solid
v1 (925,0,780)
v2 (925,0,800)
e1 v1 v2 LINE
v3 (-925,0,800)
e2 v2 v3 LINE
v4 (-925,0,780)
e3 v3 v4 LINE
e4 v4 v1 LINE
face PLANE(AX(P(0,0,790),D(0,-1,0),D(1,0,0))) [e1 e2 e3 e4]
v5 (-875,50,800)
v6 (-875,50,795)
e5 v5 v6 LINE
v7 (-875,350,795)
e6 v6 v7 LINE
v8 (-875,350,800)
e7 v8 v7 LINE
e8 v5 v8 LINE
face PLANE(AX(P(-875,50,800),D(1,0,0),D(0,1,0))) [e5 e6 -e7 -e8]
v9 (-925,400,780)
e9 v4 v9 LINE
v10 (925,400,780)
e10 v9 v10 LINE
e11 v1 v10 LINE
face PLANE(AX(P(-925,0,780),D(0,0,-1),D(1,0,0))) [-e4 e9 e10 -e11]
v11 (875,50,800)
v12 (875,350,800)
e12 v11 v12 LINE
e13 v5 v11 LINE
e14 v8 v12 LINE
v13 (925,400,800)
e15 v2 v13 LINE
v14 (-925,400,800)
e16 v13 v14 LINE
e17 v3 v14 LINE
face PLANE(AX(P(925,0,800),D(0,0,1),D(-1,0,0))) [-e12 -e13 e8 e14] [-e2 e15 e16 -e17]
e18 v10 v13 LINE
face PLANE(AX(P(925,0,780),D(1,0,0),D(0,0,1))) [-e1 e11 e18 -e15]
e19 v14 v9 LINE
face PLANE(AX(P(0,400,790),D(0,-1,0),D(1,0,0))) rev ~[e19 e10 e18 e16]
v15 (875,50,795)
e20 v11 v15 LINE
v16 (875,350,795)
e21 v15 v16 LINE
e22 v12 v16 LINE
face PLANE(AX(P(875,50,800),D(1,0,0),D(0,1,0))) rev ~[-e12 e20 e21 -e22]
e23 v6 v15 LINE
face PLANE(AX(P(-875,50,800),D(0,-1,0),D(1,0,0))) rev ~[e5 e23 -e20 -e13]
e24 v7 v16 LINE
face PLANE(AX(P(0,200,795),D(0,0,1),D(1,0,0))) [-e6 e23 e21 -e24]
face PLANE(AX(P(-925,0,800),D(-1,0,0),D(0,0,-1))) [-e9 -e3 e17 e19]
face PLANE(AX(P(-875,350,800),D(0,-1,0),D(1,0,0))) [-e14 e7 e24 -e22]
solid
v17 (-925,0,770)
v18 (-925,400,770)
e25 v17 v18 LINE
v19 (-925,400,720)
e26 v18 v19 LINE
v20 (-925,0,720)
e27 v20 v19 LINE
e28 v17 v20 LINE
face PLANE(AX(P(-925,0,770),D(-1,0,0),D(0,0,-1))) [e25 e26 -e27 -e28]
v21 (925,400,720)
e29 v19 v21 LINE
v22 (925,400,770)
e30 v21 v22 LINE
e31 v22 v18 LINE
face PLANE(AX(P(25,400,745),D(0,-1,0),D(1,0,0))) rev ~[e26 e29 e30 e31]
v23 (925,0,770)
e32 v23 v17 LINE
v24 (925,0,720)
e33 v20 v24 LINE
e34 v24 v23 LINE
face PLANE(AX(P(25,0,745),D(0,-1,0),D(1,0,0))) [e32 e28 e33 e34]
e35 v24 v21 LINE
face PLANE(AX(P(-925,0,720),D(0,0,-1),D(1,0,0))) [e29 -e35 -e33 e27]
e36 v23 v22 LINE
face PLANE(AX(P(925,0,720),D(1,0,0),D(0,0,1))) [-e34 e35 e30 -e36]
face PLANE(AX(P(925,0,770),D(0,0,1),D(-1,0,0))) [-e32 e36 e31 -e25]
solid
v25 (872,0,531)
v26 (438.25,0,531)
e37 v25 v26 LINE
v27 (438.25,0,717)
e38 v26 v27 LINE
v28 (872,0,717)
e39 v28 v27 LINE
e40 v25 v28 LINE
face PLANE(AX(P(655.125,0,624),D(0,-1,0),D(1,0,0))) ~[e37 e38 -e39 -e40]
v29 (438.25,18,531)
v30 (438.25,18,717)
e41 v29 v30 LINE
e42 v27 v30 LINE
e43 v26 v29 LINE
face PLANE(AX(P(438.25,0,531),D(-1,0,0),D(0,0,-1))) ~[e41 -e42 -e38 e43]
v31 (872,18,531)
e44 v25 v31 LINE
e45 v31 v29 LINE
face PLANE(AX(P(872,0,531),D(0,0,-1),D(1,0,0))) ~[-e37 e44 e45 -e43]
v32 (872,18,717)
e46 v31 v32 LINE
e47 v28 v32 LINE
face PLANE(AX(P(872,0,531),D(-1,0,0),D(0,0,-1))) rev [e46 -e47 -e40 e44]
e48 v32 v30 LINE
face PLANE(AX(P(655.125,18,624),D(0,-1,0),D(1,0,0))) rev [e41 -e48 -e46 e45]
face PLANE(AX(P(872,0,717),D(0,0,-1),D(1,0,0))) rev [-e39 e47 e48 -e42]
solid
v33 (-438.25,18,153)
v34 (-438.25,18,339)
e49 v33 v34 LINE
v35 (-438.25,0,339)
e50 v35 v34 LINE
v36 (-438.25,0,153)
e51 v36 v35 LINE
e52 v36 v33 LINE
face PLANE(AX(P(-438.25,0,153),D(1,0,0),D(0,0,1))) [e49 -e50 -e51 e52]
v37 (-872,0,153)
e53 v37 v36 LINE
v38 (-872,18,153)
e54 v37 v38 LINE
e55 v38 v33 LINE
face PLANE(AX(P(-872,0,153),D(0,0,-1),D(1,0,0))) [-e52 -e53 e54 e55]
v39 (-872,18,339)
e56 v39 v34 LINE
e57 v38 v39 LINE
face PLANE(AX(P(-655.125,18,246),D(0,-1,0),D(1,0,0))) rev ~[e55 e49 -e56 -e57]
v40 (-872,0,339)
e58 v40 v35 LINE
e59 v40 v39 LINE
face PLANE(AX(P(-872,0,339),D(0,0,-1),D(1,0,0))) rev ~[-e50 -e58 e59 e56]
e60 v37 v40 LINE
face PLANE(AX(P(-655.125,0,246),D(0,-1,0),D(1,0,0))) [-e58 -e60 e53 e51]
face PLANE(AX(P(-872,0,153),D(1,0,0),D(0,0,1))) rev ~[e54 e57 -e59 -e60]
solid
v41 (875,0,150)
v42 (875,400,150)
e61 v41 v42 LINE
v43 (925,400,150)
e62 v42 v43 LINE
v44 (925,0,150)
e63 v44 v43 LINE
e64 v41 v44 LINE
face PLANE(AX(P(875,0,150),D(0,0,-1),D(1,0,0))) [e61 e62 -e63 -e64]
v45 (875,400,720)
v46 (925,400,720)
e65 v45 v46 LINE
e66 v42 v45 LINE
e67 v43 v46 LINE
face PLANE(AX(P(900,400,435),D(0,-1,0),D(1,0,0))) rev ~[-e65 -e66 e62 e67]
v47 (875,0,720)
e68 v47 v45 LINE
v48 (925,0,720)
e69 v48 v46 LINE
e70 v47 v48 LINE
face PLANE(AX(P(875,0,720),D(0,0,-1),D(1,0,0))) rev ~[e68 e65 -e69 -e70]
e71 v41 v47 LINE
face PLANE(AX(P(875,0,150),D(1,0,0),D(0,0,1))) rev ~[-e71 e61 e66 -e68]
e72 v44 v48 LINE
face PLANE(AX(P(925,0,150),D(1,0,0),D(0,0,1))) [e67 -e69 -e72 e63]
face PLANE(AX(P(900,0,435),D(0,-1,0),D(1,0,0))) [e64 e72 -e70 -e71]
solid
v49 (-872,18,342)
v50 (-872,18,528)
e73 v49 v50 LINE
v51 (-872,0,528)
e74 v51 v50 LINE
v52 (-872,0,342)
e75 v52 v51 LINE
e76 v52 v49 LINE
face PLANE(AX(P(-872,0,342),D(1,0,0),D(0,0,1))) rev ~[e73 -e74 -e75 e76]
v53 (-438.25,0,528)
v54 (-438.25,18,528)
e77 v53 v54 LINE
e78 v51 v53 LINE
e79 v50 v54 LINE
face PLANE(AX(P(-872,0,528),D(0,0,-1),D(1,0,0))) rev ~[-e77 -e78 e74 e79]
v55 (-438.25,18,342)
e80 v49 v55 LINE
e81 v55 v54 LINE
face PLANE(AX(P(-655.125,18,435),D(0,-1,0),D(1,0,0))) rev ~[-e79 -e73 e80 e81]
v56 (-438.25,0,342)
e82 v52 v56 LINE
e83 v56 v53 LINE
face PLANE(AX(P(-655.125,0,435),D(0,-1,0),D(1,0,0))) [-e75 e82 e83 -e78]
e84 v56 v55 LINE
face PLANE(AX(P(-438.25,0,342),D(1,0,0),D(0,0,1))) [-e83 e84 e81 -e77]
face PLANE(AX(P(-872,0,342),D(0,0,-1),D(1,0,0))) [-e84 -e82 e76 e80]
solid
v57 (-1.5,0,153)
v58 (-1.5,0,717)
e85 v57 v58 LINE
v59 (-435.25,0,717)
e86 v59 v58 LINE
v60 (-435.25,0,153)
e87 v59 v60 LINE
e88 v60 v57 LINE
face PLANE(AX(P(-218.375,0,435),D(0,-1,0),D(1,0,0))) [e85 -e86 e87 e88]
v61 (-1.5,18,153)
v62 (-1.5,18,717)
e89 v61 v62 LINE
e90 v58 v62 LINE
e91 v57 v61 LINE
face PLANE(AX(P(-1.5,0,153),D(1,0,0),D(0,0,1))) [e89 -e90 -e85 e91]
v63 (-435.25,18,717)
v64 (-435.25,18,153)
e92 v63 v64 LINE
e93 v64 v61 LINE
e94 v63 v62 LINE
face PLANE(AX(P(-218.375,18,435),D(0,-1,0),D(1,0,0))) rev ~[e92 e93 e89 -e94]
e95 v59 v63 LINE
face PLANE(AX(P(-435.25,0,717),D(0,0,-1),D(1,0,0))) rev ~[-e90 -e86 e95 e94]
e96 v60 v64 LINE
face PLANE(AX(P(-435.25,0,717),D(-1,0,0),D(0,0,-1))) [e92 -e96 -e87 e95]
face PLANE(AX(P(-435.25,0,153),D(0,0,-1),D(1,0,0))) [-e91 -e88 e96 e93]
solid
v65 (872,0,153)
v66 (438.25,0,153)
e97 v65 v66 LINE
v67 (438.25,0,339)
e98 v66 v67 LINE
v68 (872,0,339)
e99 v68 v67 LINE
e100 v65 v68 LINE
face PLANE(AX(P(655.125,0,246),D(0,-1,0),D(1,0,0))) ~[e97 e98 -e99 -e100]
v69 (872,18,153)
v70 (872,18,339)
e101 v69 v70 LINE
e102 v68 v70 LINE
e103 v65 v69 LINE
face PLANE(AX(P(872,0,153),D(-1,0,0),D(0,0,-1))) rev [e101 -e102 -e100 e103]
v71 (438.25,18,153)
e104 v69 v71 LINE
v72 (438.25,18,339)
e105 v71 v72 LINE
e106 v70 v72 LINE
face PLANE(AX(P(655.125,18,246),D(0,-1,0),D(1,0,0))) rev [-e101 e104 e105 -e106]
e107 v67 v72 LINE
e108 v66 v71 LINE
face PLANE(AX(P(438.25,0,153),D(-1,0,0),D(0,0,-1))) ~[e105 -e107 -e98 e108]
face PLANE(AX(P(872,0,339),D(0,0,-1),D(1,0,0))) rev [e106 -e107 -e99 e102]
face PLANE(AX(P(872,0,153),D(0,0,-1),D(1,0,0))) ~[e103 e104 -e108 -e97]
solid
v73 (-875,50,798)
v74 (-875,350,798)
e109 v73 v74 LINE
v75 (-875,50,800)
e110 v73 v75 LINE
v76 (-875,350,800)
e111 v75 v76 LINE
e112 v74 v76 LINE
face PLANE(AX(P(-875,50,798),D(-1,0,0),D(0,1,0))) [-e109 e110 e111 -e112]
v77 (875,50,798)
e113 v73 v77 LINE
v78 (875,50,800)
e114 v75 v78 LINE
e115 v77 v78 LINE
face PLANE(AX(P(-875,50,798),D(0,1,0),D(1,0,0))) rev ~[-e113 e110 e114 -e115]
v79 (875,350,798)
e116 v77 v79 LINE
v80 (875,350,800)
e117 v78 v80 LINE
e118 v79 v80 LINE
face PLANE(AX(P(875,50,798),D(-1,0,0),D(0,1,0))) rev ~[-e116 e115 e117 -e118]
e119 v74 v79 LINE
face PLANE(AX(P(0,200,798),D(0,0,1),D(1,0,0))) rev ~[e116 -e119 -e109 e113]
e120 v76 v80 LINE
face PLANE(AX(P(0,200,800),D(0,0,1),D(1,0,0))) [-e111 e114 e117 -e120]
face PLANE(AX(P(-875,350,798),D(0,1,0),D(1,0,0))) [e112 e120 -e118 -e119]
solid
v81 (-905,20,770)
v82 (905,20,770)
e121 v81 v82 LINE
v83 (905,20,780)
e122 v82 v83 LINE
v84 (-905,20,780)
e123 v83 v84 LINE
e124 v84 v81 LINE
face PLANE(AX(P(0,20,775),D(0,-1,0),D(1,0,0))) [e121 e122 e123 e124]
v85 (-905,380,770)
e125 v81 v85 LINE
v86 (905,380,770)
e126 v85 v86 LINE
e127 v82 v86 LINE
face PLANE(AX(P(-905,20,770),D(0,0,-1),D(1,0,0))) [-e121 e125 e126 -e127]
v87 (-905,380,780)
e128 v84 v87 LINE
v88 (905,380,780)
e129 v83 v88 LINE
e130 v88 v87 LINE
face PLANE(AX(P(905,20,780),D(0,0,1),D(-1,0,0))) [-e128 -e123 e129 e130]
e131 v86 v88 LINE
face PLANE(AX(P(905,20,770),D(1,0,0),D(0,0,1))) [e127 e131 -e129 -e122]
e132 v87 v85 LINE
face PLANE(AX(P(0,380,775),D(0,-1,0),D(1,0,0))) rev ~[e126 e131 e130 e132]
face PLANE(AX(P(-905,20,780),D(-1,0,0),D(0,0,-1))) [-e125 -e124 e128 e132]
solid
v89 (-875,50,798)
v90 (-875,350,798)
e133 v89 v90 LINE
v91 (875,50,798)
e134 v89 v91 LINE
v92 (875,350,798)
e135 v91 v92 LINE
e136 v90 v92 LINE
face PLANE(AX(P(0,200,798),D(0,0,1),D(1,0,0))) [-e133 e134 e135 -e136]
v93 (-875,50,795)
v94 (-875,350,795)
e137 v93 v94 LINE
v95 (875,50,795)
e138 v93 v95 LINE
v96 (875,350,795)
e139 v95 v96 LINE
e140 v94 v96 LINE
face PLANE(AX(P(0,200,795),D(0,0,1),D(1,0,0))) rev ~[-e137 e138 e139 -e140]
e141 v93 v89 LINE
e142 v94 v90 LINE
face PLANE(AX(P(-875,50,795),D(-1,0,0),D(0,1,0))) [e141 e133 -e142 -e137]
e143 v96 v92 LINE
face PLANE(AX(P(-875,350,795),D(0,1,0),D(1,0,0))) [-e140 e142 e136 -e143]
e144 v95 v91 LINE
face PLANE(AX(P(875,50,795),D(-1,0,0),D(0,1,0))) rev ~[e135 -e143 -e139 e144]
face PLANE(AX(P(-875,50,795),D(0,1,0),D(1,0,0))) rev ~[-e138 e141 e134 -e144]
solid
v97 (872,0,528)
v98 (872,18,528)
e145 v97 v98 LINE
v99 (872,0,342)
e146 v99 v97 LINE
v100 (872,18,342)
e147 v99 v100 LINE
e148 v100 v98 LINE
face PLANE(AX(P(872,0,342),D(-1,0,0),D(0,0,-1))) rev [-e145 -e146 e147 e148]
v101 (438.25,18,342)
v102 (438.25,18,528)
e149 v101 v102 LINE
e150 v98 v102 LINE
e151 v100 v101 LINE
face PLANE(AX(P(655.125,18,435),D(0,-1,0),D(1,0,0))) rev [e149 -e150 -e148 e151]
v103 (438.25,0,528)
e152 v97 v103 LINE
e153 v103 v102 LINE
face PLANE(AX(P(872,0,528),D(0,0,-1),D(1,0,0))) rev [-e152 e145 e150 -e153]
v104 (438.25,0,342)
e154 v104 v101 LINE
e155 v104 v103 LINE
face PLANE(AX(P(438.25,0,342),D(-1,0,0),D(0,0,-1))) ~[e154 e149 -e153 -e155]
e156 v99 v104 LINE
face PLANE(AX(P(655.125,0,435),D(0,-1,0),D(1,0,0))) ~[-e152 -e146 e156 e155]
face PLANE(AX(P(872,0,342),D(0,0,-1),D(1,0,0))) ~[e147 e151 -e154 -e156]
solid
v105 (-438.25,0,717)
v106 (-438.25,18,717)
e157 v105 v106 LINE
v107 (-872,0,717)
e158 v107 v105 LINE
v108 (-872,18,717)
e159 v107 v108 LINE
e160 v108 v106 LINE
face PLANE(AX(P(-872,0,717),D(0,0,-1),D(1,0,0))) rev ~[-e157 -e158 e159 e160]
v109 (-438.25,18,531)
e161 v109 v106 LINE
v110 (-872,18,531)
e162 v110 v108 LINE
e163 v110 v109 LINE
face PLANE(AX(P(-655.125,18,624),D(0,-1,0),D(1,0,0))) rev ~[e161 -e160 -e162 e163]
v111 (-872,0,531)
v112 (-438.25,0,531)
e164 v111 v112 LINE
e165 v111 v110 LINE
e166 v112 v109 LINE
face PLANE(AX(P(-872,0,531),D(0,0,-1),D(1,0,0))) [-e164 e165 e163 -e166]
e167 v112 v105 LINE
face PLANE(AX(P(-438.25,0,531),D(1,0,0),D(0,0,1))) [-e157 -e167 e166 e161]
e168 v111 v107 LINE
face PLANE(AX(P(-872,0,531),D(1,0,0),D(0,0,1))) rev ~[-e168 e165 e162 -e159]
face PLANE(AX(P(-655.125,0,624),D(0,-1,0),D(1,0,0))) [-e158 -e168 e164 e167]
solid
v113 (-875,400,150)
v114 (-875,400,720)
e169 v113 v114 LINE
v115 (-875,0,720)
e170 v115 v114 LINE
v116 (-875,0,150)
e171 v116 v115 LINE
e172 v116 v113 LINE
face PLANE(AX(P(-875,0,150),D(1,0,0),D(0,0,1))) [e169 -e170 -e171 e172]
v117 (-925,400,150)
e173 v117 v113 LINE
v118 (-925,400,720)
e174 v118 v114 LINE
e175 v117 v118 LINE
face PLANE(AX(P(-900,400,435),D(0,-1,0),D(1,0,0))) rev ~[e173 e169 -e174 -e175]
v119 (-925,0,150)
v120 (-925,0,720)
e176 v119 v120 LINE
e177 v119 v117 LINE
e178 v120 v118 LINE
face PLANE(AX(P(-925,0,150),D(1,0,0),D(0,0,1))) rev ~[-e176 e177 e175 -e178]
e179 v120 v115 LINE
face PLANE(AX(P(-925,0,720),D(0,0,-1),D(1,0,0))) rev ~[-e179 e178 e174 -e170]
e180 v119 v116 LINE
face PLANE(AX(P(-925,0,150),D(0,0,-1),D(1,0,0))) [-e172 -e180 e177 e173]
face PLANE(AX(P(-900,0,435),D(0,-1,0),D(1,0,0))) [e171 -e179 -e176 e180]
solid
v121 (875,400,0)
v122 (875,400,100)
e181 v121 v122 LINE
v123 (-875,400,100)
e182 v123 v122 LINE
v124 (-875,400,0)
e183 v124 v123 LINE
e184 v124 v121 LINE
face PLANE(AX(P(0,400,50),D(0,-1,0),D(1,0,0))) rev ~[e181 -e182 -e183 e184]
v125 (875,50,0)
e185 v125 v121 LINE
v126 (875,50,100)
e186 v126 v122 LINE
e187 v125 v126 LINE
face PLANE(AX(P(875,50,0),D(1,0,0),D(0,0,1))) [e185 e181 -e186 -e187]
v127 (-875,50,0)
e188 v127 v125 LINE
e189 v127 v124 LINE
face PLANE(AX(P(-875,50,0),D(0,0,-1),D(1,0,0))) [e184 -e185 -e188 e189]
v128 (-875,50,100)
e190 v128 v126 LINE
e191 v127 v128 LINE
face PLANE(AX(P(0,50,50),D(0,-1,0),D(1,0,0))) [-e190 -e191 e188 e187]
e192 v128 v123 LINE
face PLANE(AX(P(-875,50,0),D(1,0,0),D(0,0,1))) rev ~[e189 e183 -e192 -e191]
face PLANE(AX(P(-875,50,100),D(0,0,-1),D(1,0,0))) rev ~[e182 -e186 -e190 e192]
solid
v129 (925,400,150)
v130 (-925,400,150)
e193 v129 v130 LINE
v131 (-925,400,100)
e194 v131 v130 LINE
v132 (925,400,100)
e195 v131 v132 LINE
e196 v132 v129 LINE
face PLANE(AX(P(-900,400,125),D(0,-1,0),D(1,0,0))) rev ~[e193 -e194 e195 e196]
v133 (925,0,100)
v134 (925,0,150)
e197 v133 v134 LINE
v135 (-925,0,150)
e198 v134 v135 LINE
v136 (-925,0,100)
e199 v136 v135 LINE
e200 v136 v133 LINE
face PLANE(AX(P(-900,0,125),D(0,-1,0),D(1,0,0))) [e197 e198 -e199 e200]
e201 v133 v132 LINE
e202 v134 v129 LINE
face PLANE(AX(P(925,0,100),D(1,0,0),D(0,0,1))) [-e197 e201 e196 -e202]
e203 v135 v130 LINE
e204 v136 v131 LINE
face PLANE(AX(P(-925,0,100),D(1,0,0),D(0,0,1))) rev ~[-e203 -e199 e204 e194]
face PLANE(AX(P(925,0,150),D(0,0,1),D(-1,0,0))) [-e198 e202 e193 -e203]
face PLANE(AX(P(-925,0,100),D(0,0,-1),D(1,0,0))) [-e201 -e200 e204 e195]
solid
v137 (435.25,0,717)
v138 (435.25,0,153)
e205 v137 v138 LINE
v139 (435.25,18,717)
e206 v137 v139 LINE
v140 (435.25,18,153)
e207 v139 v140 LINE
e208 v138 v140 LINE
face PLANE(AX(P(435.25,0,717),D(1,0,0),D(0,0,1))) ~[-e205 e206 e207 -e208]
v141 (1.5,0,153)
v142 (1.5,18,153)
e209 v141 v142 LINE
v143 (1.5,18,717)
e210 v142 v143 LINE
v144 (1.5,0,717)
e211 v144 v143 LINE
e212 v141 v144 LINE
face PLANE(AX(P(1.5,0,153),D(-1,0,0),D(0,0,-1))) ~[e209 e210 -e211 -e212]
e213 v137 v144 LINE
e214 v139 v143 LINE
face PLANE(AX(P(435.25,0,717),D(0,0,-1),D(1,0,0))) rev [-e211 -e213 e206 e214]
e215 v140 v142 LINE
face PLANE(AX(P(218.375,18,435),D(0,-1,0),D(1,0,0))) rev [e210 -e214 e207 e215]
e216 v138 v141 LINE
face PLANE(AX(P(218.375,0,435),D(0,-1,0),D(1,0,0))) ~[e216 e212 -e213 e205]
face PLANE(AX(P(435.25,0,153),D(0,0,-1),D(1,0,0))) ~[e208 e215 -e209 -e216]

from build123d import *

# Parameters (mm, degrees)
F1_DEPTH  = 400
F0_W      = 50
F0_H      = 50
F0_W_2    = 1750
F0_H_2    = 570
F2_DEPTH  = 400
F3_START  = -50
F0_H_3    = 100
F3_DEPTH  = 350
F0_W_3    = 433.75
F0_H_4    = 186
F4_DEPTH  = 18
F0_H_5    = 3
F5_START  = -20
F5_DEPTH  = 360
F6_DEPTH  = 400
F9_W      = 1750
F9_H      = 300
F10_DEPTH = 5
F11_DEPTH = 3
F12_DEPTH = 2


# Not quite as in the source:
# - a feature names something its author has since deleted; it is built from what else it names


with BuildPart() as f1:
    # F0 (on Front) → F1 (new body)
    with BuildSketch(Plane.XZ):
        Polygon((905, 770), (-875, 770), (-875, 720), (-872, 720), (875, 720), (925, 720), (925, 770), align=None)
        Polygon((-905, 770), (-925, 770), (-925, 720), (-875, 720), (-875, 770), align=None)
    extrude(amount=-F1_DEPTH)


with BuildPart() as f1b:
    # F0 (on Front) → F1, piece 2 (new body)
    with BuildSketch(Plane.XZ):
        with Locations((-900, 125)):
            Rectangle(F0_W, F0_H)
        with Locations((0, 125)):
            Rectangle(F0_W_2, F0_H)
        with Locations((900, 125)):
            Rectangle(F0_W, F0_H)
    extrude(amount=-F1_DEPTH)


with BuildPart() as f2:
    # F0 (on Front) → F2 (new body)
    with BuildSketch(Plane.XZ):
        with Locations((-900, 435)):
            Rectangle(F0_W, F0_H_2)
    extrude(amount=-F2_DEPTH)


with BuildPart() as f2b:
    # F0 (on Front) → F2, piece 2 (new body)
    with BuildSketch(Plane.XZ):
        with Locations((900, 435)):
            Rectangle(F0_W, F0_H_2)
    extrude(amount=-F2_DEPTH)


with BuildPart() as f3:
    # F0 (on Front) → F3 (new body)
    with BuildSketch(Plane.XZ.offset(F3_START)):
        with Locations((0, 50)):
            Rectangle(F0_W_2, F0_H_3)
    extrude(amount=-F3_DEPTH)


with BuildPart() as f4:
    # F0 (on Front) → F4 (new body)
    with BuildSketch(Plane.XZ):
        with Locations((-655.125, 435)):
            Rectangle(F0_W_3, F0_H_4)
    extrude(amount=-F4_DEPTH)


with BuildPart() as f4b:
    # F0 (on Front) → F4, piece 2 (new body)
    with BuildSketch(Plane.XZ):
        with Locations((-655.125, 246)):
            Rectangle(F0_W_3, F0_H_4)
    extrude(amount=-F4_DEPTH)


with BuildPart() as f4c:
    # F0 (on Front) → F4, piece 3 (new body)
    with BuildSketch(Plane.XZ):
        with Locations((-218.375, 435)):
            Rectangle(F0_W_3, F0_H_4)
        with Locations((-218.375, 246)):
            Rectangle(F0_W_3, F0_H_4)
        with Locations((-218.375, 340.5)):
            Rectangle(F0_W_3, F0_H_5)
        with Locations((-218.375, 624)):
            Rectangle(F0_W_3, F0_H_4)
        with Locations((-218.375, 529.5)):
            Rectangle(F0_W_3, F0_H_5)
    extrude(amount=-F4_DEPTH)


with BuildPart() as f4d:
    # F0 (on Front) → F4, piece 4 (new body)
    with BuildSketch(Plane.XZ):
        with Locations((-655.125, 624)):
            Rectangle(F0_W_3, F0_H_4)
    extrude(amount=-F4_DEPTH)


with BuildPart() as f5:
    # F0 (on Front) → F5 (new body)
    with BuildSketch(Plane.XZ.offset(F5_START)):
        Polygon((-905, 780), (-905, 770), (-875, 770), (905, 770), (905, 780), align=None)
    extrude(amount=-F5_DEPTH)


with BuildPart() as f6:
    # F0 (on Front) → F6 (new body)
    with BuildSketch(Plane.XZ):
        Polygon((-925, 780), (-905, 780), (905, 780), (925, 780), (925, 800), (-925, 800), align=None)
    extrude(amount=-F6_DEPTH)

    # F9 (on face) → F10 (cut)
    with BuildSketch(Plane.XY.offset(800)):
        with Locations((0, 200)):
            Rectangle(F9_W, F9_H)
    extrude(amount=-F10_DEPTH, mode=Mode.SUBTRACT)


with BuildPart() as f8_1:
    # F8: instance of F4d
    add(f4d.part.mirror(Plane(origin=(0, 9, 435), x_dir=(0, 1, 0), z_dir=(1, 0, 0))))


with BuildPart() as f8_2:
    # F8: instance of F4
    add(f4.part.mirror(Plane(origin=(0, 9, 435), x_dir=(0, 1, 0), z_dir=(1, 0, 0))))


with BuildPart() as f8_3:
    # F8: instance of F4b
    add(f4b.part.mirror(Plane(origin=(0, 9, 435), x_dir=(0, 1, 0), z_dir=(1, 0, 0))))


with BuildPart() as f8_4:
    # F8: instance of F4c
    add(f4c.part.mirror(Plane(origin=(0, 9, 435), x_dir=(0, 1, 0), z_dir=(1, 0, 0))))


with BuildPart() as f11:
    # F11 (new): a face of the model
    f11_faces = [f6.part.faces().sort_by_distance(p)[0] for p in [
        (0, 200, 795),
    ]]
    extrude(f11_faces, amount=F11_DEPTH)


with BuildPart() as f12:
    # F12 (new): a face of the model
    f12_faces = [f11.part.faces().sort_by_distance(p)[0] for p in [
        (0, 200, 798),
    ]]
    extrude(f12_faces, amount=F12_DEPTH)


solid = Compound([f1.part, f1b.part, f2.part, f2b.part, f3.part, f4.part, f4b.part, f4c.part, f4d.part, f5.part, f6.part, f8_1.part, f8_2.part, f8_3.part, f8_4.part, f11.part, f12.part])
